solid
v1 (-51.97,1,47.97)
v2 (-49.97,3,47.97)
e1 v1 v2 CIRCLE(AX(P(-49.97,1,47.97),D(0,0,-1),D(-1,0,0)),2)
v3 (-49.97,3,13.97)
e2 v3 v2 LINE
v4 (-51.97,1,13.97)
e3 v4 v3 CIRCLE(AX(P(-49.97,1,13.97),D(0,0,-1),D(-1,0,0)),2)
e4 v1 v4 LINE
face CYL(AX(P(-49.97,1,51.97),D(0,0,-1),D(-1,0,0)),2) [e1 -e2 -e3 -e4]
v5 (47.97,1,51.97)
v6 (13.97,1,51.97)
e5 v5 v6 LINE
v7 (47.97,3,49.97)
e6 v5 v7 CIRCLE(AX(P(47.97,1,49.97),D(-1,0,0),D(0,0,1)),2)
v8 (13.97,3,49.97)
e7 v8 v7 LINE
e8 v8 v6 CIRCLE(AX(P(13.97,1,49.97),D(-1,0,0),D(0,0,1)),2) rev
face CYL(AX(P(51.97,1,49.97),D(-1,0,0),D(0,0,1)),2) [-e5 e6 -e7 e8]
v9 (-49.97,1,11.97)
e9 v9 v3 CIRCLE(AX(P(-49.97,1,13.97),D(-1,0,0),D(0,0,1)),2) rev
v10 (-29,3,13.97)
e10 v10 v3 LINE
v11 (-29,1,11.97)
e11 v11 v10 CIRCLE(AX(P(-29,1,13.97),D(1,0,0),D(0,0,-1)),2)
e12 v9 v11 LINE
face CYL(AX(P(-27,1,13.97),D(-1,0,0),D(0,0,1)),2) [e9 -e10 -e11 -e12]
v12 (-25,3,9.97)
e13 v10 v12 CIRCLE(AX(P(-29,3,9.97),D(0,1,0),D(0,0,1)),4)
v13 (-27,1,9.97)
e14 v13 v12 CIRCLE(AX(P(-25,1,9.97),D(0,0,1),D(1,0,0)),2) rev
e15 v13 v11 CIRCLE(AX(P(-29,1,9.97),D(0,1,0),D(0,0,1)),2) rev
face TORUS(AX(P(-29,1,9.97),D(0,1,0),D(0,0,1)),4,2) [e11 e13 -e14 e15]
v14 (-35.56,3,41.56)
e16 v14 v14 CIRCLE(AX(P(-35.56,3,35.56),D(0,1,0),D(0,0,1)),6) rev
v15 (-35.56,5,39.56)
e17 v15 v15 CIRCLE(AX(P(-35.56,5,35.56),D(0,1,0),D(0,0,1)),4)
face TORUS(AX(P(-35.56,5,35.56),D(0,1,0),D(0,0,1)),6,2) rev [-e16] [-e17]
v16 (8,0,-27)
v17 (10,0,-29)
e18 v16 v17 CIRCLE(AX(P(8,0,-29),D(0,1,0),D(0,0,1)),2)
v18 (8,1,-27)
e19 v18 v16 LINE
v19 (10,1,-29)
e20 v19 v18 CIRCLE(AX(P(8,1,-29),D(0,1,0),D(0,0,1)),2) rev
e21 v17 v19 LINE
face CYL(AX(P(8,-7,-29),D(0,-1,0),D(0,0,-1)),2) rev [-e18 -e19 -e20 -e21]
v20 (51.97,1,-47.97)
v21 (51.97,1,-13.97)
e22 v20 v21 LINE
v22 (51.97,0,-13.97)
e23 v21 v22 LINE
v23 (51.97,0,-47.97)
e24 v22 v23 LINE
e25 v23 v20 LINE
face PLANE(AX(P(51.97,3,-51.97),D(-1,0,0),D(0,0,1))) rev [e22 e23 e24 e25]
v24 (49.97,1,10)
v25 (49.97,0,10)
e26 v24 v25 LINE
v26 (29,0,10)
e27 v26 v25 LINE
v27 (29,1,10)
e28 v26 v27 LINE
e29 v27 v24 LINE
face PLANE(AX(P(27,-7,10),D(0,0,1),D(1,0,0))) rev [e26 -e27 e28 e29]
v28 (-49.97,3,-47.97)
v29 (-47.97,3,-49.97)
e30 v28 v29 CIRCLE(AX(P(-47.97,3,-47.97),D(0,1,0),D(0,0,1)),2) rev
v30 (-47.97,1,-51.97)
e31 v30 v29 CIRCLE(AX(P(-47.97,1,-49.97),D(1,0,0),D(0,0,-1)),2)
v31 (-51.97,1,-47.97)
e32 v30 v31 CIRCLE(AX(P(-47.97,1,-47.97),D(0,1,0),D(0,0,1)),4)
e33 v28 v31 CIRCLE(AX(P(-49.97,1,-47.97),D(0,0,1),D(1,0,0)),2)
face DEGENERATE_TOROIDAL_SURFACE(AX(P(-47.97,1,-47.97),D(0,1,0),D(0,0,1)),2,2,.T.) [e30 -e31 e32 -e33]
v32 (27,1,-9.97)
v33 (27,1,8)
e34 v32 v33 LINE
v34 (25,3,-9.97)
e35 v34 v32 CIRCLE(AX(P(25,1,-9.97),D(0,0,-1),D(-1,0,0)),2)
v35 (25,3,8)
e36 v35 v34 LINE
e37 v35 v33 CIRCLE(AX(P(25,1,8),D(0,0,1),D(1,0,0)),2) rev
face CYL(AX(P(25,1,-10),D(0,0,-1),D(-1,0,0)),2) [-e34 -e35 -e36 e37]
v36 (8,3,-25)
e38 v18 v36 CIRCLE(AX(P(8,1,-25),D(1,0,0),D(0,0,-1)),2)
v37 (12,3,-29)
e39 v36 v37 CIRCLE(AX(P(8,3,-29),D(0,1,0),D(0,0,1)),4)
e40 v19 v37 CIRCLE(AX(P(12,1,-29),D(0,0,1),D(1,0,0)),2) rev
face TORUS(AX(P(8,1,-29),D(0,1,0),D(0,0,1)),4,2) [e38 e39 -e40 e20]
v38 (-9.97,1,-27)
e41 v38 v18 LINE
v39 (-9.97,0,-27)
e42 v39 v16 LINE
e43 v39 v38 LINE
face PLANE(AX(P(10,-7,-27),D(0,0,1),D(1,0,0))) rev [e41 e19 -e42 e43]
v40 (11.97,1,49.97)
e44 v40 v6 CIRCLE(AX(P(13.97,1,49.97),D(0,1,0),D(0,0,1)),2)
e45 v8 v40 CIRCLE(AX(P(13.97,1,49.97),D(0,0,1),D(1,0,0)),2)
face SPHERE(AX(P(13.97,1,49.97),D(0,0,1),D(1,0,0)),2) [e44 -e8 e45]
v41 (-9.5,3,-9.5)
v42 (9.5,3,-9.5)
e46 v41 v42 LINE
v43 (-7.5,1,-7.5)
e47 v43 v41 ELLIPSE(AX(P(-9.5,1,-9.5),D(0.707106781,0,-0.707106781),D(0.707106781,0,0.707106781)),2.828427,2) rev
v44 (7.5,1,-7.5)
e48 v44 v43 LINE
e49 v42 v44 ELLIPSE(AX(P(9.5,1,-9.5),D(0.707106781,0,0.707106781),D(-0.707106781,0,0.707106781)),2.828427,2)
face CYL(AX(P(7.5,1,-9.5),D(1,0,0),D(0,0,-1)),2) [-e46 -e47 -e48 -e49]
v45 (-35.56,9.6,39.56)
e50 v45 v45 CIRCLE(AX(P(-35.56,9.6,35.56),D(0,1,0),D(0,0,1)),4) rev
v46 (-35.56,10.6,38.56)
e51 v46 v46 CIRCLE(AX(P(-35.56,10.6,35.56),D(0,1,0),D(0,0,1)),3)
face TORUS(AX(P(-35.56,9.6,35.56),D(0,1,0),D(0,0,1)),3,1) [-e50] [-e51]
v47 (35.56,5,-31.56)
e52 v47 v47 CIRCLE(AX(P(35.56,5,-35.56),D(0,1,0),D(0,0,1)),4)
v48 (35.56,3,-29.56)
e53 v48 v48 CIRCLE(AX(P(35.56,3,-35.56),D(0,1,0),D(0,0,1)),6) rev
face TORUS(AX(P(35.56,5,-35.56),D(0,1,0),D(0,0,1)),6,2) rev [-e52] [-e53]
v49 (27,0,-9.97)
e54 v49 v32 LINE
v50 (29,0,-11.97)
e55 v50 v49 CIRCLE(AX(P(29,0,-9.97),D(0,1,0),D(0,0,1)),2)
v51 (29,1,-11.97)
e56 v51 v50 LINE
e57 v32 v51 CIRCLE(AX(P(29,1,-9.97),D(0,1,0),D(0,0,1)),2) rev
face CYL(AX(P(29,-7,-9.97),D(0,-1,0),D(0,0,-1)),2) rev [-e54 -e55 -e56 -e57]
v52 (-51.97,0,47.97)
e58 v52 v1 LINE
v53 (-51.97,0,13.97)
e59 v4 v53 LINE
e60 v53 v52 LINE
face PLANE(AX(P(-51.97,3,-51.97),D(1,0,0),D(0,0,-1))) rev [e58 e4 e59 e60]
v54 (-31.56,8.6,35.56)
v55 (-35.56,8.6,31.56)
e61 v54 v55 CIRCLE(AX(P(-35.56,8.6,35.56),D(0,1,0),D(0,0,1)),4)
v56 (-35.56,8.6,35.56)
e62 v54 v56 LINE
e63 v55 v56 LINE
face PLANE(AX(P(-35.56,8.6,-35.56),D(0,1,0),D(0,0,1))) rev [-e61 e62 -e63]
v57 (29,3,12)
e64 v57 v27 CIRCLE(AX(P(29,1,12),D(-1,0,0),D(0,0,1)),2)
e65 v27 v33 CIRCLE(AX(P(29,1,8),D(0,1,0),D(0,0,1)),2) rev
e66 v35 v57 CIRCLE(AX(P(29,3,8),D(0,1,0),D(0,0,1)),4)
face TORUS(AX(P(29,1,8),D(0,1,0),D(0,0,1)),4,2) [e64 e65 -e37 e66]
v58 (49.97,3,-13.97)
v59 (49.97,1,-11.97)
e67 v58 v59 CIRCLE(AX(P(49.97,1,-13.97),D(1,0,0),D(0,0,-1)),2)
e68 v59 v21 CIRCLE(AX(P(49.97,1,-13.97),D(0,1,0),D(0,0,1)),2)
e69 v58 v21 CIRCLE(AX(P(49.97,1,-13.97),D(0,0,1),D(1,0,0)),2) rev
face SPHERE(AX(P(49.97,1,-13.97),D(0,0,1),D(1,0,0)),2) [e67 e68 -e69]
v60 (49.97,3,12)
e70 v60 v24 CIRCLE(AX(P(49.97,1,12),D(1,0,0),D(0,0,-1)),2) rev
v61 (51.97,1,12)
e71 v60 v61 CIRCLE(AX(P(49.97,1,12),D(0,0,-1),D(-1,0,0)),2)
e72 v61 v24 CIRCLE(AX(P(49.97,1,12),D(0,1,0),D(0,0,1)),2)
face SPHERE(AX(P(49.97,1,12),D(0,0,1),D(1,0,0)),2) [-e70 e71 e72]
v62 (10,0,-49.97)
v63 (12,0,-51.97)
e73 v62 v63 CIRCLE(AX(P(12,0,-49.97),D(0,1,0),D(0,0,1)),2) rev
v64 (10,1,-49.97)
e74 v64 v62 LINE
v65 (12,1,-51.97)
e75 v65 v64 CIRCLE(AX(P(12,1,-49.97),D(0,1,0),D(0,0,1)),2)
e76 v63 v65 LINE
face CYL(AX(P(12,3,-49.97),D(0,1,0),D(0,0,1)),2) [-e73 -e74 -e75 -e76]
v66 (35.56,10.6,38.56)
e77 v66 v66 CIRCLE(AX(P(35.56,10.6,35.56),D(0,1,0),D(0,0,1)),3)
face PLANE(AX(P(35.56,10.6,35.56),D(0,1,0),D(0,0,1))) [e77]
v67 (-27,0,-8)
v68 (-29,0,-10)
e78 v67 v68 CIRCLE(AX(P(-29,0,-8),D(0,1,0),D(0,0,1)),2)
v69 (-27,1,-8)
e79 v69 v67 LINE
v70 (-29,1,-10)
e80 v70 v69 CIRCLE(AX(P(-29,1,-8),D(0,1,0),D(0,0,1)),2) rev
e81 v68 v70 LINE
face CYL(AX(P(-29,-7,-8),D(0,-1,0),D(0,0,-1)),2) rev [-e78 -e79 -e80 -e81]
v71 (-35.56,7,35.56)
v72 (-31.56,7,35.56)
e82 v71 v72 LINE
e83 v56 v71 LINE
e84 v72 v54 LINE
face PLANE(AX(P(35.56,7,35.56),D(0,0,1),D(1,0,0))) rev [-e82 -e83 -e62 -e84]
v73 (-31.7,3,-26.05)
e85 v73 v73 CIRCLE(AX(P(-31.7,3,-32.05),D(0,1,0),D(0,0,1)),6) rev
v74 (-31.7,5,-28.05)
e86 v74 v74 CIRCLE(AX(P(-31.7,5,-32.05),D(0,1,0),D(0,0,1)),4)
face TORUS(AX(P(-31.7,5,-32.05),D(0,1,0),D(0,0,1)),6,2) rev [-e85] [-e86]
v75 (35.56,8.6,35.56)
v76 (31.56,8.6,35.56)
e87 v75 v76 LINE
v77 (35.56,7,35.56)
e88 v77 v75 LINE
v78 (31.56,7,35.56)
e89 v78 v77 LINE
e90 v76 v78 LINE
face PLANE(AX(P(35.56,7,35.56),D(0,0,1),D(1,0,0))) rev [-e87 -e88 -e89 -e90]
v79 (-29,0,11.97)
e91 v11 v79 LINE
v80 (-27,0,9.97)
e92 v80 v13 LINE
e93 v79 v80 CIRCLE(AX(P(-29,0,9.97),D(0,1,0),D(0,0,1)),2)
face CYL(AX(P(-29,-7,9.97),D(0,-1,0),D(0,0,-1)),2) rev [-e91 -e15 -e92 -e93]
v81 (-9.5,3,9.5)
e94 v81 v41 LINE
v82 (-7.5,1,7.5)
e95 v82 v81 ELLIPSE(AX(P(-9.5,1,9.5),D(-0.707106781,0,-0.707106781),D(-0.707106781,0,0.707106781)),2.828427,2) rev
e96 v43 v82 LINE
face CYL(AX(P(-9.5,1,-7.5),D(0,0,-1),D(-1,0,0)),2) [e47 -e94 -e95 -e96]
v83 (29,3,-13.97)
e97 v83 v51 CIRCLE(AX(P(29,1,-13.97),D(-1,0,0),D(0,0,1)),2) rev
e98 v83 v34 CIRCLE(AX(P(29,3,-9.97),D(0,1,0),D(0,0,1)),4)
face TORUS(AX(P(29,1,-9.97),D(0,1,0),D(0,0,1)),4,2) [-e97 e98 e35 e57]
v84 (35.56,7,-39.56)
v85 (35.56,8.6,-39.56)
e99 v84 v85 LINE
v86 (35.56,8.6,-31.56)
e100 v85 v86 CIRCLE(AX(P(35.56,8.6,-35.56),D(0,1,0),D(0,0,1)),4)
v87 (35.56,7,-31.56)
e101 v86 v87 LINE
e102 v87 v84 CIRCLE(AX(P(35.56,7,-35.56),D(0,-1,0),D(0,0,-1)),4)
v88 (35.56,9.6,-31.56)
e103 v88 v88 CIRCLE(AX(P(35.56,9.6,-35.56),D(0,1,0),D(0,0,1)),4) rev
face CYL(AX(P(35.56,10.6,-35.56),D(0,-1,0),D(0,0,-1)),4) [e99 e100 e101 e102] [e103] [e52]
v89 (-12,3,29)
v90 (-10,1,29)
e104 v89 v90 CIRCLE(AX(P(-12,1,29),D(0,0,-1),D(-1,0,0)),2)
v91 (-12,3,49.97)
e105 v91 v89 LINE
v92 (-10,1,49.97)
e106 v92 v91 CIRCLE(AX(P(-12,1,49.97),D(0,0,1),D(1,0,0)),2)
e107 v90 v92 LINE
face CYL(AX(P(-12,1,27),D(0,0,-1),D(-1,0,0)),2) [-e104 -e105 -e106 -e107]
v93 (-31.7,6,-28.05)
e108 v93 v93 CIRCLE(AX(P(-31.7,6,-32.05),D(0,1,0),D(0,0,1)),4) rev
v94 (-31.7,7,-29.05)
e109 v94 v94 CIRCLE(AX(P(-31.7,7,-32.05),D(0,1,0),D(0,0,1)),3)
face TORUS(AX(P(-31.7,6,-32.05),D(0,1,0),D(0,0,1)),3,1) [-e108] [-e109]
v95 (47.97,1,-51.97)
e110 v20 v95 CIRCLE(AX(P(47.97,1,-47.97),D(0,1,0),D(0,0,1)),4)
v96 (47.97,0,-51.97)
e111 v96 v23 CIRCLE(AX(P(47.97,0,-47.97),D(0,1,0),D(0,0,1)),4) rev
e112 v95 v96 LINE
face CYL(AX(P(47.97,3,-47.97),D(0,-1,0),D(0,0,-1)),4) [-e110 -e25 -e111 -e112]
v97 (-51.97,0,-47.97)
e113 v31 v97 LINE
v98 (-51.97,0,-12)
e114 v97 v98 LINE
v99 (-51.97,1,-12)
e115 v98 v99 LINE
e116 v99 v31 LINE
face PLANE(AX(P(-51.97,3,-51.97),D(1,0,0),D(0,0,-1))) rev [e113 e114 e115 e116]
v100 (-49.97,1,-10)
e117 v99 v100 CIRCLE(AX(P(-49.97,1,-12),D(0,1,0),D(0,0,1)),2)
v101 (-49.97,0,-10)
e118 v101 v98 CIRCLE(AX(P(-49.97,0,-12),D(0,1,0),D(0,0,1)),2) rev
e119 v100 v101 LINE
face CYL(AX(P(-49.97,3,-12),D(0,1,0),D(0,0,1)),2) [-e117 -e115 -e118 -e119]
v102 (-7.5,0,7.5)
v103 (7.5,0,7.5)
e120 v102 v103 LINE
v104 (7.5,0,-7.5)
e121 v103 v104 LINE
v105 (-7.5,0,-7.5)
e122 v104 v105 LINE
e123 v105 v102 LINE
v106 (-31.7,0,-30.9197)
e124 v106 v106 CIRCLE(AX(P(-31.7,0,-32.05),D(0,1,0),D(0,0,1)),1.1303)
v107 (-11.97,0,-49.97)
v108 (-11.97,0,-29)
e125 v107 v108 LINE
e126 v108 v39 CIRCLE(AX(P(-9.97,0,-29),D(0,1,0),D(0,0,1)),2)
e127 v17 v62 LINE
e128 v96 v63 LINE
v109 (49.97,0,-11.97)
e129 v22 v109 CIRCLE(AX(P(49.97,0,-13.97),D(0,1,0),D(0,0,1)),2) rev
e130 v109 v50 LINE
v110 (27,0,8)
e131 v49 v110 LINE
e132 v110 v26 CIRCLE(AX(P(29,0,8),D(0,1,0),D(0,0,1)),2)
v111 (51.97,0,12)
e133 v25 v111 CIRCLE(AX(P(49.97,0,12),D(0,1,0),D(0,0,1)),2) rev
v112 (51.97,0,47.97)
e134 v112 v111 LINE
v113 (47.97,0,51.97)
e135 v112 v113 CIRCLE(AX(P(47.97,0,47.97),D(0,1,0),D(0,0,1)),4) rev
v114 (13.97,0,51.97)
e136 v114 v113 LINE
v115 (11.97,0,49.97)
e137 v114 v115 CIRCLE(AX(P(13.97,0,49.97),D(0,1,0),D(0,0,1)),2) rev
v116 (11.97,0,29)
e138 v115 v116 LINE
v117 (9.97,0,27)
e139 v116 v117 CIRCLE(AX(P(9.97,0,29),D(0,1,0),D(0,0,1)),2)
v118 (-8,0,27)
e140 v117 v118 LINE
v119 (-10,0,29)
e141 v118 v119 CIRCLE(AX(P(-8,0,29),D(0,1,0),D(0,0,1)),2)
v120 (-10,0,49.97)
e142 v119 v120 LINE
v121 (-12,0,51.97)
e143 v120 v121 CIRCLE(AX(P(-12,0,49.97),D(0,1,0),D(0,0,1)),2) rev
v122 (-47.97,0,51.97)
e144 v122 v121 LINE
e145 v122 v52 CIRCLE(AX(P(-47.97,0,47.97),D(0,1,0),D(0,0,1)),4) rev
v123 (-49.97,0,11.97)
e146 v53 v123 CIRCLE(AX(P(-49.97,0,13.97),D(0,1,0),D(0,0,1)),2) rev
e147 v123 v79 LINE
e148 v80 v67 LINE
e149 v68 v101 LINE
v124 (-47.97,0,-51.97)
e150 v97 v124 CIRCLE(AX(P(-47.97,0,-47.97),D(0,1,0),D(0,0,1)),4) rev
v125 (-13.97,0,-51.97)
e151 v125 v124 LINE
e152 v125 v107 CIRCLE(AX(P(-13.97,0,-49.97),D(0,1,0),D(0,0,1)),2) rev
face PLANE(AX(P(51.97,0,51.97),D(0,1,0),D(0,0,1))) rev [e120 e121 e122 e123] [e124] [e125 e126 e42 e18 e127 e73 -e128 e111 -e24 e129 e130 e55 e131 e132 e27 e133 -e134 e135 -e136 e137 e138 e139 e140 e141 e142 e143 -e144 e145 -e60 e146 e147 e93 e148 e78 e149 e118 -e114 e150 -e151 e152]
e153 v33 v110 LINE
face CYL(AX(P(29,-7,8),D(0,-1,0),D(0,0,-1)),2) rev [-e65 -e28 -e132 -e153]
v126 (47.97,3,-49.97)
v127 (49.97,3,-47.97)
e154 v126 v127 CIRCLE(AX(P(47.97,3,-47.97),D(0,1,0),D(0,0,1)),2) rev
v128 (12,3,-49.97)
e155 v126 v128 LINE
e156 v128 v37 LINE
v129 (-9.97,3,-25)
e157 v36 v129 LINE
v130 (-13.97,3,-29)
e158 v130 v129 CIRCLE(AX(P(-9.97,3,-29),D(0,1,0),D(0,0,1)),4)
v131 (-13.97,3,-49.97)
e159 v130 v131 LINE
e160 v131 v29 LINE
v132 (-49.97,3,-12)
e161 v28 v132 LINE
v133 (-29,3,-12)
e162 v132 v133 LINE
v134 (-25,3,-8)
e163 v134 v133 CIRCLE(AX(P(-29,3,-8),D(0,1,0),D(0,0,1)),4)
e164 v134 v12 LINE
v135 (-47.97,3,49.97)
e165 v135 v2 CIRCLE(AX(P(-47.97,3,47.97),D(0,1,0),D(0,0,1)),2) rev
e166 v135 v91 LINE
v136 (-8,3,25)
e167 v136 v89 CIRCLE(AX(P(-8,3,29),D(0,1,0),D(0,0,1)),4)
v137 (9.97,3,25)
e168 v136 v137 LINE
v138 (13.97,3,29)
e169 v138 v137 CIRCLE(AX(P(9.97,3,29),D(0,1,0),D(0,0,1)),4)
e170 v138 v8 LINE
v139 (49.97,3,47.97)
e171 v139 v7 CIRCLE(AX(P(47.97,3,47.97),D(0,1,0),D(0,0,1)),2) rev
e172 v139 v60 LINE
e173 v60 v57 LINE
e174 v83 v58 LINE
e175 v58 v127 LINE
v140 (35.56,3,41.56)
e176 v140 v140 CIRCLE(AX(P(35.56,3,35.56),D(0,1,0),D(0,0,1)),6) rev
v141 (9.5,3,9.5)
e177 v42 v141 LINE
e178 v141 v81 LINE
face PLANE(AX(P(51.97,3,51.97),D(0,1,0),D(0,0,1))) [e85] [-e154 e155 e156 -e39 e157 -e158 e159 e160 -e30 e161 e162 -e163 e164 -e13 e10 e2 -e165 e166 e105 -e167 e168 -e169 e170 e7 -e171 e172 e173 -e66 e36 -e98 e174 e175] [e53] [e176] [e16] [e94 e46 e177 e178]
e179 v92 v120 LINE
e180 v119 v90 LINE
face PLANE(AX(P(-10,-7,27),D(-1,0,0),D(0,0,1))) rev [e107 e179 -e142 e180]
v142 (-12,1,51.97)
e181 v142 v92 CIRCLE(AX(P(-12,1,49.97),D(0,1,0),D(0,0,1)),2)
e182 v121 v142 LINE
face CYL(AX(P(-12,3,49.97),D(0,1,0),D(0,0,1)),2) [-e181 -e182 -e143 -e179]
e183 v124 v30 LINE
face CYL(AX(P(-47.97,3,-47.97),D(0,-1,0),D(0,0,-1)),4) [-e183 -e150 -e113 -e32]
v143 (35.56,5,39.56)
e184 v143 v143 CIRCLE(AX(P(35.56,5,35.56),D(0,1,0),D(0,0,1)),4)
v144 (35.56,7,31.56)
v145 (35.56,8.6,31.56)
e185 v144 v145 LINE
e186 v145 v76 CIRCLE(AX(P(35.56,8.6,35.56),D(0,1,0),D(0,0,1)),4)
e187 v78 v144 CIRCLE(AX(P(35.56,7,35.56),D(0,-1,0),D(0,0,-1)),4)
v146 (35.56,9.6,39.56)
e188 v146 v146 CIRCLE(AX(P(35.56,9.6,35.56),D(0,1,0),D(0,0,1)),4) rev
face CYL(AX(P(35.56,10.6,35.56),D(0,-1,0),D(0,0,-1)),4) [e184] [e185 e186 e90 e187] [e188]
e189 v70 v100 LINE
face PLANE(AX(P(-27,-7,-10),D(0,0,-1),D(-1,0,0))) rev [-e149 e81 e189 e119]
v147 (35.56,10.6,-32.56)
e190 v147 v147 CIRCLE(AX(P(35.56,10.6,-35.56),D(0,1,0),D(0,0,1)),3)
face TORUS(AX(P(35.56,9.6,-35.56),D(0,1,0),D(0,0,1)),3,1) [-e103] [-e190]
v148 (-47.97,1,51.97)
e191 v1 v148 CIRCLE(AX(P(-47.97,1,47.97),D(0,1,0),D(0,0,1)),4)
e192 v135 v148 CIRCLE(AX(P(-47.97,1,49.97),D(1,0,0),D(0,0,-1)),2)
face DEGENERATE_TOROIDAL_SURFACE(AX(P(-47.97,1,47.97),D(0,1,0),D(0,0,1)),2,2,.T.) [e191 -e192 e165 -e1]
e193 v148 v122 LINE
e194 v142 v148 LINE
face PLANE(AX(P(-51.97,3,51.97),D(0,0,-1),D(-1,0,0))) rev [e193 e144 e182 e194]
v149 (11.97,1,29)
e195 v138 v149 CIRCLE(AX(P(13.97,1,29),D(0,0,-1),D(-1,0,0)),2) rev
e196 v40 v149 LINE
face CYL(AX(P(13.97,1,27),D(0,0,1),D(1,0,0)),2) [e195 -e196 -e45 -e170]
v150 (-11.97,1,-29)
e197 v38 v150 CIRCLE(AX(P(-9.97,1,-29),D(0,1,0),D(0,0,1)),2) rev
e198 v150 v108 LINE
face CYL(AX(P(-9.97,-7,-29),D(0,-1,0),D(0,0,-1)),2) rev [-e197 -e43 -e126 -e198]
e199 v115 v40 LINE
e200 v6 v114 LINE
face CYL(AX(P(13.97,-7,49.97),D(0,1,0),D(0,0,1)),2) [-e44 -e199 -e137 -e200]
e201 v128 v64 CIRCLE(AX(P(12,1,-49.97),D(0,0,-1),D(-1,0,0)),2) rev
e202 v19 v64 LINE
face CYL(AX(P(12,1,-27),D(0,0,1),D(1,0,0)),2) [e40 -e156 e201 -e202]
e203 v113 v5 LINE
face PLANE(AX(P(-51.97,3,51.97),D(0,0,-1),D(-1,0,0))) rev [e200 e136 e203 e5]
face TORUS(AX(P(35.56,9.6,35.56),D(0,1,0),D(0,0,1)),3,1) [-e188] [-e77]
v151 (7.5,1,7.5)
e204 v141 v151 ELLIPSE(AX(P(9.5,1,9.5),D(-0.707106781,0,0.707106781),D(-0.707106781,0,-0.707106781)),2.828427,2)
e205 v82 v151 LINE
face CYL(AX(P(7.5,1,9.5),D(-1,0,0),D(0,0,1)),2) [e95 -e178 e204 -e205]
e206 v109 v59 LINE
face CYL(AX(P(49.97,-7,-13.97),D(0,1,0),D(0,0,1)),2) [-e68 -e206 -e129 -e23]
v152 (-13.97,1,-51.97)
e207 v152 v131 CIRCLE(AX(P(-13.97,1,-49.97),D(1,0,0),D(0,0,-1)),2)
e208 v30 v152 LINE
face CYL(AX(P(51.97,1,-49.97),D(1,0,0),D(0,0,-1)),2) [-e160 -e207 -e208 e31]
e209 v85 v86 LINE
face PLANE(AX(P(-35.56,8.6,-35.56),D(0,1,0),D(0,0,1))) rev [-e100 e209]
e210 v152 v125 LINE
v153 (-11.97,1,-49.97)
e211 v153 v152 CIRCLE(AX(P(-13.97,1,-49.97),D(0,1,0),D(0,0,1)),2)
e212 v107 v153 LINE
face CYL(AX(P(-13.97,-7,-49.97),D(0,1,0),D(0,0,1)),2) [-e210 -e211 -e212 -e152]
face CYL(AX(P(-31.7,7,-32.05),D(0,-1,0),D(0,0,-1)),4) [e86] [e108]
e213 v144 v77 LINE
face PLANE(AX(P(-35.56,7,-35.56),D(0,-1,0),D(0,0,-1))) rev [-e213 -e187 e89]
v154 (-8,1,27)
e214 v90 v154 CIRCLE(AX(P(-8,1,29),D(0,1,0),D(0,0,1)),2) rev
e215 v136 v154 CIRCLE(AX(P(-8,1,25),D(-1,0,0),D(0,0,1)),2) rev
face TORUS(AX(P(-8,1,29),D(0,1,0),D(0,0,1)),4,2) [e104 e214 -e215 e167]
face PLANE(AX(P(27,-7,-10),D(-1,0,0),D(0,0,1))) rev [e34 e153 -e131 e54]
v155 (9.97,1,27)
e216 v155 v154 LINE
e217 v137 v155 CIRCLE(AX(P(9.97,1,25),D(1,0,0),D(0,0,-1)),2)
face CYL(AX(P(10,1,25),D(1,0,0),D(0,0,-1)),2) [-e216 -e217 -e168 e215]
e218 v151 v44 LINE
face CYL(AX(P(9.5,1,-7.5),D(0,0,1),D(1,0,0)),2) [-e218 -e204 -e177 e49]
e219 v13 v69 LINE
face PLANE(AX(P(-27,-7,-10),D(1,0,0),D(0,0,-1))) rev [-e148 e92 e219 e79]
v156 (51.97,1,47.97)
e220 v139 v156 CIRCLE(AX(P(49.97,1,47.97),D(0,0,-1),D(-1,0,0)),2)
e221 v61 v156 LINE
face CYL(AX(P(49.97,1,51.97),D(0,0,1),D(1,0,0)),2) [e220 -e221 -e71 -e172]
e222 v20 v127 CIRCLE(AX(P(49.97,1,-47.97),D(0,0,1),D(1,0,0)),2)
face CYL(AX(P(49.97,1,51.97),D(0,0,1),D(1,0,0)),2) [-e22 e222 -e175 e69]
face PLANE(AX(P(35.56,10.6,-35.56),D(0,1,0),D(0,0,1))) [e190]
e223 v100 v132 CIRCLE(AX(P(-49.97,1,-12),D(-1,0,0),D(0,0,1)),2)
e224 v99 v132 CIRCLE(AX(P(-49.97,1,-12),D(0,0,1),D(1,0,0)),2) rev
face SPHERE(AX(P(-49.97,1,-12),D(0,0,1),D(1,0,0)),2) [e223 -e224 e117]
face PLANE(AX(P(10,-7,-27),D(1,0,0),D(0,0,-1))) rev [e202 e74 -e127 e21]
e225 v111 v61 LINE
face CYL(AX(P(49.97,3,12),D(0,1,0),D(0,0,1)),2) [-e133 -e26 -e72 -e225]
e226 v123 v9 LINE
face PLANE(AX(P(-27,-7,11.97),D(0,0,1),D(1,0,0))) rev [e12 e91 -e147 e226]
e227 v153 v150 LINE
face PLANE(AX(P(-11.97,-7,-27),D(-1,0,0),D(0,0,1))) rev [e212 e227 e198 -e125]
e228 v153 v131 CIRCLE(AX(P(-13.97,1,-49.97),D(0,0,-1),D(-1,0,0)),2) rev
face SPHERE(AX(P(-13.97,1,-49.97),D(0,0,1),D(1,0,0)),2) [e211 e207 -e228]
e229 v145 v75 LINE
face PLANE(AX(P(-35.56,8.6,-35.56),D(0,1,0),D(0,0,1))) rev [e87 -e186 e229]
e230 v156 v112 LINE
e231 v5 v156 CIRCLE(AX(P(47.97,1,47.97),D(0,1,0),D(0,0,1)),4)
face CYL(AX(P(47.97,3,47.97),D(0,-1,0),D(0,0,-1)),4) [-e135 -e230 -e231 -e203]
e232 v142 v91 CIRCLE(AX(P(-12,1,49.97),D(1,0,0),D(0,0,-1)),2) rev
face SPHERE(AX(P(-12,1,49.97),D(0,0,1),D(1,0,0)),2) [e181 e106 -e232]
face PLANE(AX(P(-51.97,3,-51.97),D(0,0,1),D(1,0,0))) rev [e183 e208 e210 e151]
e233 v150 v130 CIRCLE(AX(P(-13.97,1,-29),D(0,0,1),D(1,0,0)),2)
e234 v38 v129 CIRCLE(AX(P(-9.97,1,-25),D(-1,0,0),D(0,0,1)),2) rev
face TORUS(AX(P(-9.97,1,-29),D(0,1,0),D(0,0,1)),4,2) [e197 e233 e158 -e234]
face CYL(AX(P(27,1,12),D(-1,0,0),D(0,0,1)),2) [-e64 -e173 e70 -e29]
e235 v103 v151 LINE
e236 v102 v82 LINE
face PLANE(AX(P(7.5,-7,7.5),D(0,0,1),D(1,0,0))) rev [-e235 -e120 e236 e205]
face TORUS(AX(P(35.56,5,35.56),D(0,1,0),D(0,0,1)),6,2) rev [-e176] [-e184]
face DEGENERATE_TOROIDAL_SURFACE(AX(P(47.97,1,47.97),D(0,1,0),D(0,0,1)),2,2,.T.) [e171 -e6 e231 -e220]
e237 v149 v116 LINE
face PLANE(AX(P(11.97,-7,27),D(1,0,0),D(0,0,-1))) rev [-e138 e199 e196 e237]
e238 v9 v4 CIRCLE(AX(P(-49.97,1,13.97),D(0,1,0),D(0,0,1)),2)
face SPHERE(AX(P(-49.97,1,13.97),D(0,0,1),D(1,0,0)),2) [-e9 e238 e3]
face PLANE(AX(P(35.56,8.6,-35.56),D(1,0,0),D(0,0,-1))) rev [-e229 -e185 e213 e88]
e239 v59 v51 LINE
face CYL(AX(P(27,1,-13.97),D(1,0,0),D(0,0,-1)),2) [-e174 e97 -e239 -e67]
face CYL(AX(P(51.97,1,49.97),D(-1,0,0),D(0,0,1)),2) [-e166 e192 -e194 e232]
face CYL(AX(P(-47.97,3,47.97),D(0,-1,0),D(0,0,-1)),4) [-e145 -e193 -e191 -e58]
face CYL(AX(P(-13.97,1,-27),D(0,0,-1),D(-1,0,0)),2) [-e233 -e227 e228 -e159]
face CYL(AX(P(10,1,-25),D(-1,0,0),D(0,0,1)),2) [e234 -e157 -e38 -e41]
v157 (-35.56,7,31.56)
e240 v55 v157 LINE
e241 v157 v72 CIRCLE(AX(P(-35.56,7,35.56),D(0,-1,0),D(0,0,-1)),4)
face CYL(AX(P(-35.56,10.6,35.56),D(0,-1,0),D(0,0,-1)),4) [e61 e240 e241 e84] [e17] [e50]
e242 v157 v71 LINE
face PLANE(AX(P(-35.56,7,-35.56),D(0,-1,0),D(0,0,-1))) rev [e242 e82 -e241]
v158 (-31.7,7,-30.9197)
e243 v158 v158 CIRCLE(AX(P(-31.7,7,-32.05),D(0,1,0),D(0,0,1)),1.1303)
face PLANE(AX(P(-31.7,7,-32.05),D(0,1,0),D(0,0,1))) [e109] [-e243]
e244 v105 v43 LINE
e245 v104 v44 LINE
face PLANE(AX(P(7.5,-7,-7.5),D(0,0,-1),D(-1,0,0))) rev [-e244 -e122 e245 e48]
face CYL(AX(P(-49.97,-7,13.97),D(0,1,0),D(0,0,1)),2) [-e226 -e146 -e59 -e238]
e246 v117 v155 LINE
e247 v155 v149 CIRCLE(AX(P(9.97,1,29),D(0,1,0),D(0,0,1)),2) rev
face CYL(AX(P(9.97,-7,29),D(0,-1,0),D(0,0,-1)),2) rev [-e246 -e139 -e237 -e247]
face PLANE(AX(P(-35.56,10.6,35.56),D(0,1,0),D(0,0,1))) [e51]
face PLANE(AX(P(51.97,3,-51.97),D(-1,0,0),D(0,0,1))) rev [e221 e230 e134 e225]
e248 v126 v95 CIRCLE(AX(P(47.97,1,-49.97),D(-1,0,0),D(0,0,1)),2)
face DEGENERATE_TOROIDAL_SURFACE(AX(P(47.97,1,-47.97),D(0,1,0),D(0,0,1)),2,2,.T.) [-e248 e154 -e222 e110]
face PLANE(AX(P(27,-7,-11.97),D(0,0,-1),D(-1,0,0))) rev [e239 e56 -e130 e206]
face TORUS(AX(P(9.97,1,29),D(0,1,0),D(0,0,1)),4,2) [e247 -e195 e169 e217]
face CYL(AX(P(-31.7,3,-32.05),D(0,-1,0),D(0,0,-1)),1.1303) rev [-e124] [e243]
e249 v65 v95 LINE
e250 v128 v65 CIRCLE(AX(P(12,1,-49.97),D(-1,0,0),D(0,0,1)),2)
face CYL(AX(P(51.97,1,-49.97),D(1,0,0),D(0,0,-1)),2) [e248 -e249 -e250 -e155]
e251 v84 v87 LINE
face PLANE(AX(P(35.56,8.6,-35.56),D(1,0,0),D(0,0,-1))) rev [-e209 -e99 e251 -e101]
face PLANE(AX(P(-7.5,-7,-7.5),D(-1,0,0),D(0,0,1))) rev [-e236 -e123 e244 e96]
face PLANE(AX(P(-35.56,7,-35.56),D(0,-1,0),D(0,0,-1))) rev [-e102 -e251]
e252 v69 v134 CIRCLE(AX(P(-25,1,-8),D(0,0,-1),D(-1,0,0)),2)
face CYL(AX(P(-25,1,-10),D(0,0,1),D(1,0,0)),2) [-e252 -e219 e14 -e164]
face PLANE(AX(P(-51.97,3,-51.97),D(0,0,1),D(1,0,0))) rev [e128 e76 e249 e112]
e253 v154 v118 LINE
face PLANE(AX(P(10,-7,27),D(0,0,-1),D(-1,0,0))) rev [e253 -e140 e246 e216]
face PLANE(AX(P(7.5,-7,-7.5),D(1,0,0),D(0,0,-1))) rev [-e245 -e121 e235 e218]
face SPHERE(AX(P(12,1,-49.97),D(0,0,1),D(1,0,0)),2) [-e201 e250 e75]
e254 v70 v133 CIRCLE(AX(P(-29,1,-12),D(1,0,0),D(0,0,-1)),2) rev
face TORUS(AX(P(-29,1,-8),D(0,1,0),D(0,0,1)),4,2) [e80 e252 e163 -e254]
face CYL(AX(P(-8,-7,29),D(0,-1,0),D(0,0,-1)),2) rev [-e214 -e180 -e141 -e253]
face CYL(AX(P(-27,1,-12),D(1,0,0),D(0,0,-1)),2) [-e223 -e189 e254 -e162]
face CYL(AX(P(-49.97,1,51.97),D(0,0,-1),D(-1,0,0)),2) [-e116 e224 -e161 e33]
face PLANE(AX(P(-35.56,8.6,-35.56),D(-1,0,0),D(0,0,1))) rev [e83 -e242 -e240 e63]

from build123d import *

# Parameters (mm, degrees)
SKETCH1_W           = 103.94
SKETCH1_H           = 103.94
SKETCH1_R           = 1.1303
BOSS_EXTRUDE1_DEPTH = 3
SKETCH6_R           = 4
BOSS_EXTRUDE3_DEPTH = 7.6
SKETCH7_W           = 71.12
SKETCH7_H           = 1.6
CUT_EXTRUDE4_DEPTH  = 35.56
SKETCH2_R           = 4
SKETCH2_R_2         = 1.1303
BOSS_EXTRUDE2_DEPTH = 4
SKETCH3_W           = 20
SKETCH3_H           = 24.97
SKETCH3_W_2         = 24.97
SKETCH3_H_2         = 20
CUT_EXTRUDE1_DEPTH  = 10
SKETCH4_W           = 24.97
SKETCH4_H           = 1.97
SKETCH4_W_2         = 1.97
SKETCH4_H_2         = 24.97
CUT_EXTRUDE2_DEPTH  = 10
SKETCH5_W           = 15
SKETCH5_H           = 15
CUT_EXTRUDE3_DEPTH  = 10
FILLET3_R           = 2
FILLET4_R           = 4
FILLET5_R           = 1
SKETCH8_W           = 4
SKETCH8_H           = 1.6
CUT_EXTRUDE5_DEPTH  = 10


with BuildPart() as part:
    # Sketch1 → Boss-Extrude1 (new body)
    with BuildSketch(Plane(origin=(0, 0, 0), x_dir=(1, 0, 0), z_dir=(0, 1, 0))):
        Rectangle(SKETCH1_W, SKETCH1_H)
        with Locations(Location((-31.7, 32.05, 0), (0, 0, 270))):
            Circle(SKETCH1_R, mode=Mode.SUBTRACT)
    extrude(amount=BOSS_EXTRUDE1_DEPTH)

    # Sketch6 → Boss-Extrude3 (add)
    with BuildSketch(Plane(origin=(0, 3, 0), x_dir=(1, 0, 0), z_dir=(0, 1, 0))):
        with Locations(Location((35.56, 35.56, 0), (0, 0, 90))):
            Circle(SKETCH6_R)
        with Locations(Location((35.56, -35.56, 0), (0, 0, 90))):
            Circle(SKETCH6_R)
        with Locations(Location((-35.56, -35.56, 0), (0, 0, 90))):
            Circle(SKETCH6_R)
    extrude(amount=BOSS_EXTRUDE3_DEPTH)

    # Sketch7 → Cut-Extrude4 (cut, symmetric)
    with BuildSketch(Plane.XY):
        with Locations((0, 7.8)):
            Rectangle(SKETCH7_W, SKETCH7_H)
    extrude(amount=CUT_EXTRUDE4_DEPTH, both=True, mode=Mode.SUBTRACT)

    # Sketch2 → Boss-Extrude2 (add)
    with BuildSketch(Plane(origin=(0, 3, 0), x_dir=(1, 0, 0), z_dir=(0, 1, 0))):
        with Locations(Location((-31.7, 32.05, 0), (0, 0, 270))):
            Circle(SKETCH2_R)
        with Locations(Location((-31.7, 32.05, 0), (0, 0, 270))):
            Circle(SKETCH2_R_2, mode=Mode.SUBTRACT)
    extrude(amount=BOSS_EXTRUDE2_DEPTH)

    # Sketch3 → Cut-Extrude1 (cut)
    with BuildSketch(Plane(origin=(0, 3, 0), x_dir=(1, 0, 0), z_dir=(0, 1, 0))):
        with Locations((0, 39.485)):
            Rectangle(SKETCH3_W, SKETCH3_H)
        with Locations((0, -39.485)):
            Rectangle(SKETCH3_W, SKETCH3_H)
        with Locations((-39.485, 0)):
            Rectangle(SKETCH3_W_2, SKETCH3_H_2)
        with Locations((39.485, 0)):
            Rectangle(SKETCH3_W_2, SKETCH3_H_2)
    extrude(amount=-CUT_EXTRUDE1_DEPTH, mode=Mode.SUBTRACT)

    # Sketch4 → Cut-Extrude2 (cut)
    with BuildSketch(Plane(origin=(0, 3, 0), x_dir=(1, 0, 0), z_dir=(0, 1, 0))):
        with Locations((-39.485, -10.985)):
            Rectangle(SKETCH4_W, SKETCH4_H)
        with Locations((10.985, -39.485)):
            Rectangle(SKETCH4_W_2, SKETCH4_H_2)
        with Locations((39.485, 10.985)):
            Rectangle(SKETCH4_W, SKETCH4_H)
        with Locations((-10.985, 39.485)):
            Rectangle(SKETCH4_W_2, SKETCH4_H_2)
    extrude(amount=-CUT_EXTRUDE2_DEPTH, mode=Mode.SUBTRACT)

    # Sketch5 → Cut-Extrude3 (cut)
    with BuildSketch(Plane(origin=(0, 3, 0), x_dir=(1, 0, 0), z_dir=(0, 1, 0))):
        Rectangle(SKETCH5_W, SKETCH5_H)
    extrude(amount=-CUT_EXTRUDE3_DEPTH, mode=Mode.SUBTRACT)

    # Fillet3
    fillet3_edges = [part.edges().sort_by_distance(p)[0] for p in [
        (-51.97, 3, -30.985),
        (51.97, 1.5, 10),
        (27, 1.5, 10),
        (27, 3, -0.985),
        (39.485, 3, 10),
        (-51.97, 1.5, -10),
        (-27, 1.5, -10),
        (-39.485, 3, -10),
        (-27, 3, 0.985),
        (-30.985, 3, 51.97),
        (-51.97, 3, 31.97),
        (-27, 1.5, 11.97),
        (-51.97, 1.5, 11.97),
        (-39.485, 3, 11.97),
        (31.97, 3, 51.97),
        (11.97, 1.5, 27),
        (11.97, 1.5, 51.97),
        (11.97, 3, 39.485),
        (51.97, 3, -31.97),
        (27, 1.5, -11.97),
        (51.97, 1.5, -11.97),
        (35.56, 3, -31.56),
        (39.485, 3, -11.97),
        (-31.97, 3, -51.97),
        (-11.97, 1.5, -27),
        (-11.97, 1.5, -51.97),
        (-11.97, 3, -39.485),
        (35.56, 3, 39.56),
        (-7.5, 3, 0),
        (0, 3, 7.5),
        (7.5, 3, 0),
        (0, 3, -7.5),
        (-35.56, 3, 39.56),
        (51.97, 3, 30.985),
        (-31.7, 3, -36.05),
        (10, 1.5, -51.97),
        (30.985, 3, -51.97),
        (10, 1.5, -27),
        (-0.985, 3, -27),
        (10, 3, -39.485),
        (-10, 1.5, 51.97),
        (-10, 1.5, 27),
        (0.985, 3, 27),
        (-10, 3, 39.485),
    ]]
    fillet(fillet3_edges, radius=FILLET3_R)

    # Fillet4
    # the kernel refuses this fillet: 4 mm, written as the material it takes off along each edge
    with BuildSketch(Plane(origin=(-47.97, 3, 47.97), x_dir=(-1, 0, 0), z_dir=(0, 0, -1))) as fillet4_piece_1:
        with BuildLine():
            CenterArc((2, -2), 2, 0, 90)
            Line((4, -2), (4, 0))
            Line((4, 0), (2, 0))
        make_face()
    revolve(axis=Axis((-47.97, 3, 47.97), (0, 1, 0)), revolution_arc=90, mode=Mode.SUBTRACT)
    with BuildSketch(Plane(origin=(47.97, 3, 47.97), x_dir=(0, 0, 1), z_dir=(-1, 0, 0))) as fillet4_piece_2:
        with BuildLine():
            CenterArc((2, -2), 2, 0, 90)
            Line((4, -2), (4, 0))
            Line((4, 0), (2, 0))
        make_face()
    revolve(axis=Axis((47.97, 3, 47.97), (0, 1, 0)), revolution_arc=90, mode=Mode.SUBTRACT)
    with BuildSketch(Plane(origin=(-47.97, 3, -47.97), x_dir=(0, 0, -1), z_dir=(1, 0, 0))) as fillet4_piece_3:
        with BuildLine():
            CenterArc((2, -2), 2, 0, 90)
            Line((4, -2), (4, 0))
            Line((4, 0), (2, 0))
        make_face()
    revolve(axis=Axis((-47.97, 3, -47.97), (0, 1, 0)), revolution_arc=90, mode=Mode.SUBTRACT)
    with BuildSketch(Plane(origin=(47.97, 3, -47.97), x_dir=(1, 0, 0), z_dir=(0, 0, 1))) as fillet4_piece_4:
        with BuildLine():
            CenterArc((2, -2), 2, 0, 90)
            Line((4, -2), (4, 0))
            Line((4, 0), (2, 0))
        make_face()
    revolve(axis=Axis((47.97, 3, -47.97), (0, 1, 0)), revolution_arc=90, mode=Mode.SUBTRACT)
    with BuildSketch(Plane(origin=(51.97, -10, -51.97), x_dir=(-1, 0, 0), z_dir=(0, 1, 0))) as fillet4_piece_5:
        with BuildLine():
            CenterArc((FILLET4_R, FILLET4_R), FILLET4_R, 180, 90)
            Line((0, FILLET4_R), (0, 0))
            Line((0, 0), (FILLET4_R, 0))
        make_face()
    extrude(amount=13, mode=Mode.SUBTRACT)
    with BuildSketch(Plane(origin=(51.97, -10, 51.97), x_dir=(-1, 0, 0), z_dir=(0, 1, 0)), Plane(origin=(-51.97, -10, 51.97), x_dir=(0, 0, -1), z_dir=(0, 1, 0)), Plane(origin=(-51.97, -10, -51.97), x_dir=(1, 0, 0), z_dir=(0, 1, 0))) as fillet4_piece_6:
        with BuildLine():
            CenterArc((FILLET4_R, -FILLET4_R), FILLET4_R, 90, 90)
            Line((0, -FILLET4_R), (0, 0))
            Line((0, 0), (FILLET4_R, 0))
        make_face()
    extrude(amount=13, mode=Mode.SUBTRACT)

    # Fillet5
    fillet5_edges = [part.edges().sort_by_distance(p)[0] for p in [
        (35.56, 10.6, -31.56),
        (35.56, 10.6, 39.56),
        (-35.56, 10.6, 39.56),
        (-31.7, 7, -36.05),
    ]]
    fillet(fillet5_edges, radius=FILLET5_R)

    # Sketch8 → Cut-Extrude5 (cut)
    with BuildSketch(Plane.XY.offset(-35.56)):
        with Locations((33.56, 7.8)):
            Rectangle(SKETCH8_W, SKETCH8_H)
    extrude(amount=-CUT_EXTRUDE5_DEPTH, mode=Mode.SUBTRACT)


solid = part.part
